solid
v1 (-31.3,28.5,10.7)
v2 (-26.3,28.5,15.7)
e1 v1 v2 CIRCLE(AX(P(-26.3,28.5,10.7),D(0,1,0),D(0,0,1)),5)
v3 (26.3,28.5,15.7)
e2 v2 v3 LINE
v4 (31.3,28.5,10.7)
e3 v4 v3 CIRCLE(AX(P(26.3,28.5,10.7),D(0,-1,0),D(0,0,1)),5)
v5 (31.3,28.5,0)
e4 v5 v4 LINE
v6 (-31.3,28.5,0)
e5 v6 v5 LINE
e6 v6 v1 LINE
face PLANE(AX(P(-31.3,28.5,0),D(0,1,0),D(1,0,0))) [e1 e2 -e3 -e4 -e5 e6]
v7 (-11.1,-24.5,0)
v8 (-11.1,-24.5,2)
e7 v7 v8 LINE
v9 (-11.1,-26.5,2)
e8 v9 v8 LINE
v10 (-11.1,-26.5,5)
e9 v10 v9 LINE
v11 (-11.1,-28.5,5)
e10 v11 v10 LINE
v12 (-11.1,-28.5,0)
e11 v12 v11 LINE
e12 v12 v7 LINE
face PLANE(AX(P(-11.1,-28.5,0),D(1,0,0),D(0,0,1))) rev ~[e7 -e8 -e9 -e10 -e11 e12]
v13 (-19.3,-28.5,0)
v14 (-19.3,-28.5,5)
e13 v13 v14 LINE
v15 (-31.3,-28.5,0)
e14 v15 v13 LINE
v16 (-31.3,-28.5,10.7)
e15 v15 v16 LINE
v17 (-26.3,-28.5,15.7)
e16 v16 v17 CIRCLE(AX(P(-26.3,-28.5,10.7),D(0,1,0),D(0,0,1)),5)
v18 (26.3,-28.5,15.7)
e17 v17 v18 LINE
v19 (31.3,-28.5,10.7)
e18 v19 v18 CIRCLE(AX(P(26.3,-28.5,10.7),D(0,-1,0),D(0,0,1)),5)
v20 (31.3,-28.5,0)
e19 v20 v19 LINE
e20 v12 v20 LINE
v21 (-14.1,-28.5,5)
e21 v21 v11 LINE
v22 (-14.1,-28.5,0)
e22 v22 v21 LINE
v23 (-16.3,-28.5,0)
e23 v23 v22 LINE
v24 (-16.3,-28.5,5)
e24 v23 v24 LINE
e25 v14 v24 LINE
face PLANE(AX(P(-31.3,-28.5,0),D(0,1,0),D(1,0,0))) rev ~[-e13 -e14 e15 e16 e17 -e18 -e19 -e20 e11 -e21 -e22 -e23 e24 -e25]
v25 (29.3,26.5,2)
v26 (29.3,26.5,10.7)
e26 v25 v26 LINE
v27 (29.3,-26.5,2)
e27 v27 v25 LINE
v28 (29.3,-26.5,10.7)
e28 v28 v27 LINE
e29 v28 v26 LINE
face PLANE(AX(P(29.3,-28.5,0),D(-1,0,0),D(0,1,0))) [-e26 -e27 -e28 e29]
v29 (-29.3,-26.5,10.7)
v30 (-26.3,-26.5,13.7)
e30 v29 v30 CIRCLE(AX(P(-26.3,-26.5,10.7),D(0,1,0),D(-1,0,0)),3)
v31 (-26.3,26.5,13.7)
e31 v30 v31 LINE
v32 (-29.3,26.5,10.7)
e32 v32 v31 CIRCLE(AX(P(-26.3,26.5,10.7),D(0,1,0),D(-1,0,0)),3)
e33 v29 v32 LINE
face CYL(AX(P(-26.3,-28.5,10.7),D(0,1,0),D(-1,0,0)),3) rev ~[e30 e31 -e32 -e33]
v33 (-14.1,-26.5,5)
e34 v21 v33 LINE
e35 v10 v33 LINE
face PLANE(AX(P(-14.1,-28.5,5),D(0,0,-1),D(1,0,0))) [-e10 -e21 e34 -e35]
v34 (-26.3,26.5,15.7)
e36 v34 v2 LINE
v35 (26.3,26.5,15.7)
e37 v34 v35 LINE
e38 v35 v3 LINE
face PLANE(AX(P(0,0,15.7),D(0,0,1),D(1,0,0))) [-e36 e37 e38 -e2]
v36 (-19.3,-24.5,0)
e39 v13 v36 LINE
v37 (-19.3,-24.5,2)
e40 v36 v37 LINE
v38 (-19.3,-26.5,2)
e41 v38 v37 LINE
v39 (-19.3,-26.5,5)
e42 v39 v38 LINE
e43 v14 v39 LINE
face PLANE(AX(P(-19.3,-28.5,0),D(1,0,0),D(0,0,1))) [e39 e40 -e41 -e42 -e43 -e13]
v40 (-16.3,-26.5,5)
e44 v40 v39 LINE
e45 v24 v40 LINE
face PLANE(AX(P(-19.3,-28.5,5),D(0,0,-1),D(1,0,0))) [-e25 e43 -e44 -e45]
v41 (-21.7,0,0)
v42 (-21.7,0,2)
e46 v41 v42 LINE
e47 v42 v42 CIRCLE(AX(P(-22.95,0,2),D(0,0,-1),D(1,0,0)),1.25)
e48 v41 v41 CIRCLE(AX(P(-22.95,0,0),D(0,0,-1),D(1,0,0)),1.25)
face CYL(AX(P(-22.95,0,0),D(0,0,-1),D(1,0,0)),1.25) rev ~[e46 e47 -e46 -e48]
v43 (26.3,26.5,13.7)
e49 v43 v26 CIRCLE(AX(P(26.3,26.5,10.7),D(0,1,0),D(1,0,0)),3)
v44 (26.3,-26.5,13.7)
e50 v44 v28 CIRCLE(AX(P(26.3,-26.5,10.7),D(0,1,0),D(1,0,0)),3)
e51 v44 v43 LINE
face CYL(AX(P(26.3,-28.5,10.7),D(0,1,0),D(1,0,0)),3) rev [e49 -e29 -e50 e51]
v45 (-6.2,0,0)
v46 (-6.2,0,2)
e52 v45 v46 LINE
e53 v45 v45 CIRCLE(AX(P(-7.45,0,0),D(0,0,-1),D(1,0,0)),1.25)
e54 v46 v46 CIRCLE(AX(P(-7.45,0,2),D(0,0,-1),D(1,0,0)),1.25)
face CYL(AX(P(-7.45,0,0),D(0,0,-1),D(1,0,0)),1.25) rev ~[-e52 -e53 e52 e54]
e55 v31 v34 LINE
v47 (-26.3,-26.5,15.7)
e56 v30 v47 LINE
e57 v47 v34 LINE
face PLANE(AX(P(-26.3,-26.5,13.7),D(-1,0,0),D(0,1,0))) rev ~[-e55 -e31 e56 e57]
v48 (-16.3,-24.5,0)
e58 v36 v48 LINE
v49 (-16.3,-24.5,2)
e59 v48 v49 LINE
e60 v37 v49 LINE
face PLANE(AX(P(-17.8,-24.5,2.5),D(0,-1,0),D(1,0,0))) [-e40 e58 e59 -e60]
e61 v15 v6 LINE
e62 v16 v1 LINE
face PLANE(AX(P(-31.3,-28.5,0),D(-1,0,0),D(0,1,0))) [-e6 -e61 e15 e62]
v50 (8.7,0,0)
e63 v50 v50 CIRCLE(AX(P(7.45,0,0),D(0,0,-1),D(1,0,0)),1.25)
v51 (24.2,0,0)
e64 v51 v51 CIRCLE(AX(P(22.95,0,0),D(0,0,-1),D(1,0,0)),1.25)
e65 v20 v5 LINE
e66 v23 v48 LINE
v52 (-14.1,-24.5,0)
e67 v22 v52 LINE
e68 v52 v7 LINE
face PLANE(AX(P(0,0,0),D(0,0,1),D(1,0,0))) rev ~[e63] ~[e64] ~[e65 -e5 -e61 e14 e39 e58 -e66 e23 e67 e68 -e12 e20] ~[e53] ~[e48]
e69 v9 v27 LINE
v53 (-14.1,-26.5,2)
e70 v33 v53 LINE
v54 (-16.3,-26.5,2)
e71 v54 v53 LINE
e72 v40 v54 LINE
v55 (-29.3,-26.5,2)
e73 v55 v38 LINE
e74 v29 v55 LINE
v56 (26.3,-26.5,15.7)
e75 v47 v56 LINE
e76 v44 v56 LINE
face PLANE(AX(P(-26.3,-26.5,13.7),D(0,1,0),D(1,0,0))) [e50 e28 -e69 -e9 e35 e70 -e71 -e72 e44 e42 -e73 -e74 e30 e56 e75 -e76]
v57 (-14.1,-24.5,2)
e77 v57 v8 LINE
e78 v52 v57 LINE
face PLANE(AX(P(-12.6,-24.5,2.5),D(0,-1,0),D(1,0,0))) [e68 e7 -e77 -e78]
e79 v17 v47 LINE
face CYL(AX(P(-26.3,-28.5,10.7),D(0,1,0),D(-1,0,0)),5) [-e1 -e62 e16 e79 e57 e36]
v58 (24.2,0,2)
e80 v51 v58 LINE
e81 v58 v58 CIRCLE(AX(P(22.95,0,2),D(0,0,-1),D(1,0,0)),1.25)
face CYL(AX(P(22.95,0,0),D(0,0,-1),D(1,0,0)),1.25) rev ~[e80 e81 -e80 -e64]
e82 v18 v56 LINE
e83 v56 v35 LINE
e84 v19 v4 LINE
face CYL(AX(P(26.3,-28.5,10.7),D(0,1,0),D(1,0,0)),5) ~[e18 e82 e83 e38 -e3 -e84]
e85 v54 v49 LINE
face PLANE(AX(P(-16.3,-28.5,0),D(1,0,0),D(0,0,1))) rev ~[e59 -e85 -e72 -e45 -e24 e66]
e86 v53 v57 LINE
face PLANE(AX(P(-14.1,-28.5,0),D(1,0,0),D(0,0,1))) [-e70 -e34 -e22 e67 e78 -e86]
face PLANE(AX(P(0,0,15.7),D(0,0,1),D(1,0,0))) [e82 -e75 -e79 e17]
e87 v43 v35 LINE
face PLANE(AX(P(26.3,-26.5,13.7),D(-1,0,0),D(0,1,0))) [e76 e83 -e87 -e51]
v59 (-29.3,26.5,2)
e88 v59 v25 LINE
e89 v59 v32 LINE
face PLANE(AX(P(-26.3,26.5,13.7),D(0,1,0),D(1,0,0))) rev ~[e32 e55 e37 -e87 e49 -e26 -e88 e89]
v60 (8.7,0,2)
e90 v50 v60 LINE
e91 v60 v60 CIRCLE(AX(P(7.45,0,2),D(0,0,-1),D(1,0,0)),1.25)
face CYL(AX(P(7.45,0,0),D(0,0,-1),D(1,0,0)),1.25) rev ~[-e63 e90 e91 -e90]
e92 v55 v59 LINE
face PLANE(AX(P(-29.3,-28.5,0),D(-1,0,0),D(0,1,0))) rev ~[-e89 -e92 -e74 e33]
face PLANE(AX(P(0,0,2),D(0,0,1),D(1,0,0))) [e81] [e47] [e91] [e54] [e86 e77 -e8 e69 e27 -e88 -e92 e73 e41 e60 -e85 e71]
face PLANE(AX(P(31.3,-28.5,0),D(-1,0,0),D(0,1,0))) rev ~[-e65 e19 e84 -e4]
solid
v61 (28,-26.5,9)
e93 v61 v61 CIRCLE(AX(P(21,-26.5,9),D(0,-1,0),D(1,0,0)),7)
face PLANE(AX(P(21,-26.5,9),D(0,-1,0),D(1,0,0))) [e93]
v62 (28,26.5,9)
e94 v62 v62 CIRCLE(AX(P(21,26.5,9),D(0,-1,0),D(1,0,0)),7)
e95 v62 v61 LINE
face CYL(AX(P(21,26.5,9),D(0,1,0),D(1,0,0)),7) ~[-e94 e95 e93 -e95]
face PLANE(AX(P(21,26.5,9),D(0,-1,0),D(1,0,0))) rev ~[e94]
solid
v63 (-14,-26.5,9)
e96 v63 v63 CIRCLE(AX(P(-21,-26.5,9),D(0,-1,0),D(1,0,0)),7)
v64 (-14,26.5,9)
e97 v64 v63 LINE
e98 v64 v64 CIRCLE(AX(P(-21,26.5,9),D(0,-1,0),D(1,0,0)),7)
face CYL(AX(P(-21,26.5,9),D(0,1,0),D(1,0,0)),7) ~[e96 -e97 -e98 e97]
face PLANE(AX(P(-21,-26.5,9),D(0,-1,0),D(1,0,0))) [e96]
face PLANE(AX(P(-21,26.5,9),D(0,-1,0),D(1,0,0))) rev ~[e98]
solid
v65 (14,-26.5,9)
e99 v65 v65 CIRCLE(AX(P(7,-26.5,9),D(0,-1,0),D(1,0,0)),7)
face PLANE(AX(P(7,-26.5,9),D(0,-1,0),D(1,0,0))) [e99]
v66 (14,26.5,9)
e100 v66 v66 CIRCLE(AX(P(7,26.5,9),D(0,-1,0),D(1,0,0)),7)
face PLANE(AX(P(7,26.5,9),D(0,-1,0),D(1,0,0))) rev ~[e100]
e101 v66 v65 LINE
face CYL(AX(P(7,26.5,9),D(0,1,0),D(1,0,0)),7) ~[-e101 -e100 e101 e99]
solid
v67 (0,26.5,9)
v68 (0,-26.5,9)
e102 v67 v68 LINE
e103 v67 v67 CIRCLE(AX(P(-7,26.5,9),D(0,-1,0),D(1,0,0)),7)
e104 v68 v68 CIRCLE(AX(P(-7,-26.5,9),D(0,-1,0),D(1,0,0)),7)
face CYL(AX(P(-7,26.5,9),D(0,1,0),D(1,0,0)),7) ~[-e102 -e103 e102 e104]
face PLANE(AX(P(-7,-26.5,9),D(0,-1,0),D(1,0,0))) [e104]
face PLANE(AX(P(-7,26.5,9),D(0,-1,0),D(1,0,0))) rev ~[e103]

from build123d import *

# Parameters (mm, degrees)
F0_W     = 62.6
F0_H     = 57
F1_DEPTH = 15.7
F2_R     = 5
F3_T     = -2
F4_W     = 3
F4_H     = 5
F5_DEPTH = 4
F6_R     = 1.25
F7_DEPTH = 25
F9_DEPTH = 53
F8_R     = 7


# Not quite as in the source:
# - a shell that OpenCascade refuses in one call is made with other operations: the cavity is built on its own and cut out


with BuildPart() as f1:
    # F0 (on Top) → F1 (new body)
    with BuildSketch(Plane.XY):
        Rectangle(F0_W, F0_H)
    extrude(amount=F1_DEPTH)

    # F2
    f2_edges = [f1.edges().sort_by_distance(p)[0] for p in [
        (-31.3, 0, 15.7),
        (31.3, 0, 15.7),
    ]]
    fillet(f2_edges, radius=F2_R)

    # F3: a shell. OpenCascade refuses it in one call, so the cavity is built on its own and cut out:
    # the body offset inwards by the wall thickness, plus a prism from it out through each open face.
    f3_core = offset(f1.part, amount=F3_T, mode=Mode.PRIVATE)
    f3_exits = [f3_core.faces().sort_by_distance(p)[0] for p in [
        (0, 0, 13.7),
    ]]
    add(f3_core, mode=Mode.SUBTRACT)
    extrude(f3_exits, amount=-F3_T, mode=Mode.SUBTRACT)

    # F4 (on face) → F5 (cut)
    with BuildSketch(Plane.XZ.offset(28.5)):
        with Locations((-17.8, 2.5)):
            Rectangle(F4_W, F4_H)
        with Locations((-12.6, 2.5)):
            Rectangle(F4_W, F4_H)
    extrude(amount=-F5_DEPTH, mode=Mode.SUBTRACT)

    # F6 (on face) → F7 (cut)
    with BuildSketch(Plane(origin=(0, 0, 0), x_dir=(1, 0, 0), z_dir=(0, 0, -1))):
        with Locations((-22.95, 0)):
            Circle(F6_R)
        with Locations((22.95, 0)):
            Circle(F6_R)
        with Locations((-7.45, 0)):
            Circle(F6_R)
        with Locations((7.45, 0)):
            Circle(F6_R)
    extrude(amount=-F7_DEPTH, mode=Mode.SUBTRACT)


with BuildPart() as f9:
    # F8 (on face) → F9 (new body, through all)
    with BuildSketch(Plane.XZ.offset(-26.5)):
        with BuildLine():
            ThreePointArc((14, 9), (21, 2), (28, 9))
            ThreePointArc((28, 9), (21, 16), (14, 9))
        make_face()
    extrude(amount=F9_DEPTH)


with BuildPart() as f9b:
    # F8 (on face) → F9, piece 2 (new body, through all)
    with BuildSketch(Plane.XZ.offset(-26.5)):
        with Locations((-21, 9)):
            Circle(F8_R)
    extrude(amount=F9_DEPTH)


with BuildPart() as f9c:
    # F8 (on face) → F9, piece 3 (new body, through all)
    with BuildSketch(Plane.XZ.offset(-26.5)):
        with BuildLine():
            ThreePointArc((-14, 9), (-7, 2), (0, 9))
            ThreePointArc((0, 9), (-7, 16), (-14, 9))
        make_face()
    extrude(amount=F9_DEPTH)


with BuildPart() as f9d:
    # F8 (on face) → F9, piece 4 (new body, through all)
    with BuildSketch(Plane.XZ.offset(-26.5)):
        with BuildLine():
            ThreePointArc((0, 9), (7, 2), (14, 9))
            ThreePointArc((14, 9), (7, 16), (0, 9))
        make_face()
    extrude(amount=F9_DEPTH)


solid = Compound([f1.part, f9.part, f9b.part, f9c.part, f9d.part])
